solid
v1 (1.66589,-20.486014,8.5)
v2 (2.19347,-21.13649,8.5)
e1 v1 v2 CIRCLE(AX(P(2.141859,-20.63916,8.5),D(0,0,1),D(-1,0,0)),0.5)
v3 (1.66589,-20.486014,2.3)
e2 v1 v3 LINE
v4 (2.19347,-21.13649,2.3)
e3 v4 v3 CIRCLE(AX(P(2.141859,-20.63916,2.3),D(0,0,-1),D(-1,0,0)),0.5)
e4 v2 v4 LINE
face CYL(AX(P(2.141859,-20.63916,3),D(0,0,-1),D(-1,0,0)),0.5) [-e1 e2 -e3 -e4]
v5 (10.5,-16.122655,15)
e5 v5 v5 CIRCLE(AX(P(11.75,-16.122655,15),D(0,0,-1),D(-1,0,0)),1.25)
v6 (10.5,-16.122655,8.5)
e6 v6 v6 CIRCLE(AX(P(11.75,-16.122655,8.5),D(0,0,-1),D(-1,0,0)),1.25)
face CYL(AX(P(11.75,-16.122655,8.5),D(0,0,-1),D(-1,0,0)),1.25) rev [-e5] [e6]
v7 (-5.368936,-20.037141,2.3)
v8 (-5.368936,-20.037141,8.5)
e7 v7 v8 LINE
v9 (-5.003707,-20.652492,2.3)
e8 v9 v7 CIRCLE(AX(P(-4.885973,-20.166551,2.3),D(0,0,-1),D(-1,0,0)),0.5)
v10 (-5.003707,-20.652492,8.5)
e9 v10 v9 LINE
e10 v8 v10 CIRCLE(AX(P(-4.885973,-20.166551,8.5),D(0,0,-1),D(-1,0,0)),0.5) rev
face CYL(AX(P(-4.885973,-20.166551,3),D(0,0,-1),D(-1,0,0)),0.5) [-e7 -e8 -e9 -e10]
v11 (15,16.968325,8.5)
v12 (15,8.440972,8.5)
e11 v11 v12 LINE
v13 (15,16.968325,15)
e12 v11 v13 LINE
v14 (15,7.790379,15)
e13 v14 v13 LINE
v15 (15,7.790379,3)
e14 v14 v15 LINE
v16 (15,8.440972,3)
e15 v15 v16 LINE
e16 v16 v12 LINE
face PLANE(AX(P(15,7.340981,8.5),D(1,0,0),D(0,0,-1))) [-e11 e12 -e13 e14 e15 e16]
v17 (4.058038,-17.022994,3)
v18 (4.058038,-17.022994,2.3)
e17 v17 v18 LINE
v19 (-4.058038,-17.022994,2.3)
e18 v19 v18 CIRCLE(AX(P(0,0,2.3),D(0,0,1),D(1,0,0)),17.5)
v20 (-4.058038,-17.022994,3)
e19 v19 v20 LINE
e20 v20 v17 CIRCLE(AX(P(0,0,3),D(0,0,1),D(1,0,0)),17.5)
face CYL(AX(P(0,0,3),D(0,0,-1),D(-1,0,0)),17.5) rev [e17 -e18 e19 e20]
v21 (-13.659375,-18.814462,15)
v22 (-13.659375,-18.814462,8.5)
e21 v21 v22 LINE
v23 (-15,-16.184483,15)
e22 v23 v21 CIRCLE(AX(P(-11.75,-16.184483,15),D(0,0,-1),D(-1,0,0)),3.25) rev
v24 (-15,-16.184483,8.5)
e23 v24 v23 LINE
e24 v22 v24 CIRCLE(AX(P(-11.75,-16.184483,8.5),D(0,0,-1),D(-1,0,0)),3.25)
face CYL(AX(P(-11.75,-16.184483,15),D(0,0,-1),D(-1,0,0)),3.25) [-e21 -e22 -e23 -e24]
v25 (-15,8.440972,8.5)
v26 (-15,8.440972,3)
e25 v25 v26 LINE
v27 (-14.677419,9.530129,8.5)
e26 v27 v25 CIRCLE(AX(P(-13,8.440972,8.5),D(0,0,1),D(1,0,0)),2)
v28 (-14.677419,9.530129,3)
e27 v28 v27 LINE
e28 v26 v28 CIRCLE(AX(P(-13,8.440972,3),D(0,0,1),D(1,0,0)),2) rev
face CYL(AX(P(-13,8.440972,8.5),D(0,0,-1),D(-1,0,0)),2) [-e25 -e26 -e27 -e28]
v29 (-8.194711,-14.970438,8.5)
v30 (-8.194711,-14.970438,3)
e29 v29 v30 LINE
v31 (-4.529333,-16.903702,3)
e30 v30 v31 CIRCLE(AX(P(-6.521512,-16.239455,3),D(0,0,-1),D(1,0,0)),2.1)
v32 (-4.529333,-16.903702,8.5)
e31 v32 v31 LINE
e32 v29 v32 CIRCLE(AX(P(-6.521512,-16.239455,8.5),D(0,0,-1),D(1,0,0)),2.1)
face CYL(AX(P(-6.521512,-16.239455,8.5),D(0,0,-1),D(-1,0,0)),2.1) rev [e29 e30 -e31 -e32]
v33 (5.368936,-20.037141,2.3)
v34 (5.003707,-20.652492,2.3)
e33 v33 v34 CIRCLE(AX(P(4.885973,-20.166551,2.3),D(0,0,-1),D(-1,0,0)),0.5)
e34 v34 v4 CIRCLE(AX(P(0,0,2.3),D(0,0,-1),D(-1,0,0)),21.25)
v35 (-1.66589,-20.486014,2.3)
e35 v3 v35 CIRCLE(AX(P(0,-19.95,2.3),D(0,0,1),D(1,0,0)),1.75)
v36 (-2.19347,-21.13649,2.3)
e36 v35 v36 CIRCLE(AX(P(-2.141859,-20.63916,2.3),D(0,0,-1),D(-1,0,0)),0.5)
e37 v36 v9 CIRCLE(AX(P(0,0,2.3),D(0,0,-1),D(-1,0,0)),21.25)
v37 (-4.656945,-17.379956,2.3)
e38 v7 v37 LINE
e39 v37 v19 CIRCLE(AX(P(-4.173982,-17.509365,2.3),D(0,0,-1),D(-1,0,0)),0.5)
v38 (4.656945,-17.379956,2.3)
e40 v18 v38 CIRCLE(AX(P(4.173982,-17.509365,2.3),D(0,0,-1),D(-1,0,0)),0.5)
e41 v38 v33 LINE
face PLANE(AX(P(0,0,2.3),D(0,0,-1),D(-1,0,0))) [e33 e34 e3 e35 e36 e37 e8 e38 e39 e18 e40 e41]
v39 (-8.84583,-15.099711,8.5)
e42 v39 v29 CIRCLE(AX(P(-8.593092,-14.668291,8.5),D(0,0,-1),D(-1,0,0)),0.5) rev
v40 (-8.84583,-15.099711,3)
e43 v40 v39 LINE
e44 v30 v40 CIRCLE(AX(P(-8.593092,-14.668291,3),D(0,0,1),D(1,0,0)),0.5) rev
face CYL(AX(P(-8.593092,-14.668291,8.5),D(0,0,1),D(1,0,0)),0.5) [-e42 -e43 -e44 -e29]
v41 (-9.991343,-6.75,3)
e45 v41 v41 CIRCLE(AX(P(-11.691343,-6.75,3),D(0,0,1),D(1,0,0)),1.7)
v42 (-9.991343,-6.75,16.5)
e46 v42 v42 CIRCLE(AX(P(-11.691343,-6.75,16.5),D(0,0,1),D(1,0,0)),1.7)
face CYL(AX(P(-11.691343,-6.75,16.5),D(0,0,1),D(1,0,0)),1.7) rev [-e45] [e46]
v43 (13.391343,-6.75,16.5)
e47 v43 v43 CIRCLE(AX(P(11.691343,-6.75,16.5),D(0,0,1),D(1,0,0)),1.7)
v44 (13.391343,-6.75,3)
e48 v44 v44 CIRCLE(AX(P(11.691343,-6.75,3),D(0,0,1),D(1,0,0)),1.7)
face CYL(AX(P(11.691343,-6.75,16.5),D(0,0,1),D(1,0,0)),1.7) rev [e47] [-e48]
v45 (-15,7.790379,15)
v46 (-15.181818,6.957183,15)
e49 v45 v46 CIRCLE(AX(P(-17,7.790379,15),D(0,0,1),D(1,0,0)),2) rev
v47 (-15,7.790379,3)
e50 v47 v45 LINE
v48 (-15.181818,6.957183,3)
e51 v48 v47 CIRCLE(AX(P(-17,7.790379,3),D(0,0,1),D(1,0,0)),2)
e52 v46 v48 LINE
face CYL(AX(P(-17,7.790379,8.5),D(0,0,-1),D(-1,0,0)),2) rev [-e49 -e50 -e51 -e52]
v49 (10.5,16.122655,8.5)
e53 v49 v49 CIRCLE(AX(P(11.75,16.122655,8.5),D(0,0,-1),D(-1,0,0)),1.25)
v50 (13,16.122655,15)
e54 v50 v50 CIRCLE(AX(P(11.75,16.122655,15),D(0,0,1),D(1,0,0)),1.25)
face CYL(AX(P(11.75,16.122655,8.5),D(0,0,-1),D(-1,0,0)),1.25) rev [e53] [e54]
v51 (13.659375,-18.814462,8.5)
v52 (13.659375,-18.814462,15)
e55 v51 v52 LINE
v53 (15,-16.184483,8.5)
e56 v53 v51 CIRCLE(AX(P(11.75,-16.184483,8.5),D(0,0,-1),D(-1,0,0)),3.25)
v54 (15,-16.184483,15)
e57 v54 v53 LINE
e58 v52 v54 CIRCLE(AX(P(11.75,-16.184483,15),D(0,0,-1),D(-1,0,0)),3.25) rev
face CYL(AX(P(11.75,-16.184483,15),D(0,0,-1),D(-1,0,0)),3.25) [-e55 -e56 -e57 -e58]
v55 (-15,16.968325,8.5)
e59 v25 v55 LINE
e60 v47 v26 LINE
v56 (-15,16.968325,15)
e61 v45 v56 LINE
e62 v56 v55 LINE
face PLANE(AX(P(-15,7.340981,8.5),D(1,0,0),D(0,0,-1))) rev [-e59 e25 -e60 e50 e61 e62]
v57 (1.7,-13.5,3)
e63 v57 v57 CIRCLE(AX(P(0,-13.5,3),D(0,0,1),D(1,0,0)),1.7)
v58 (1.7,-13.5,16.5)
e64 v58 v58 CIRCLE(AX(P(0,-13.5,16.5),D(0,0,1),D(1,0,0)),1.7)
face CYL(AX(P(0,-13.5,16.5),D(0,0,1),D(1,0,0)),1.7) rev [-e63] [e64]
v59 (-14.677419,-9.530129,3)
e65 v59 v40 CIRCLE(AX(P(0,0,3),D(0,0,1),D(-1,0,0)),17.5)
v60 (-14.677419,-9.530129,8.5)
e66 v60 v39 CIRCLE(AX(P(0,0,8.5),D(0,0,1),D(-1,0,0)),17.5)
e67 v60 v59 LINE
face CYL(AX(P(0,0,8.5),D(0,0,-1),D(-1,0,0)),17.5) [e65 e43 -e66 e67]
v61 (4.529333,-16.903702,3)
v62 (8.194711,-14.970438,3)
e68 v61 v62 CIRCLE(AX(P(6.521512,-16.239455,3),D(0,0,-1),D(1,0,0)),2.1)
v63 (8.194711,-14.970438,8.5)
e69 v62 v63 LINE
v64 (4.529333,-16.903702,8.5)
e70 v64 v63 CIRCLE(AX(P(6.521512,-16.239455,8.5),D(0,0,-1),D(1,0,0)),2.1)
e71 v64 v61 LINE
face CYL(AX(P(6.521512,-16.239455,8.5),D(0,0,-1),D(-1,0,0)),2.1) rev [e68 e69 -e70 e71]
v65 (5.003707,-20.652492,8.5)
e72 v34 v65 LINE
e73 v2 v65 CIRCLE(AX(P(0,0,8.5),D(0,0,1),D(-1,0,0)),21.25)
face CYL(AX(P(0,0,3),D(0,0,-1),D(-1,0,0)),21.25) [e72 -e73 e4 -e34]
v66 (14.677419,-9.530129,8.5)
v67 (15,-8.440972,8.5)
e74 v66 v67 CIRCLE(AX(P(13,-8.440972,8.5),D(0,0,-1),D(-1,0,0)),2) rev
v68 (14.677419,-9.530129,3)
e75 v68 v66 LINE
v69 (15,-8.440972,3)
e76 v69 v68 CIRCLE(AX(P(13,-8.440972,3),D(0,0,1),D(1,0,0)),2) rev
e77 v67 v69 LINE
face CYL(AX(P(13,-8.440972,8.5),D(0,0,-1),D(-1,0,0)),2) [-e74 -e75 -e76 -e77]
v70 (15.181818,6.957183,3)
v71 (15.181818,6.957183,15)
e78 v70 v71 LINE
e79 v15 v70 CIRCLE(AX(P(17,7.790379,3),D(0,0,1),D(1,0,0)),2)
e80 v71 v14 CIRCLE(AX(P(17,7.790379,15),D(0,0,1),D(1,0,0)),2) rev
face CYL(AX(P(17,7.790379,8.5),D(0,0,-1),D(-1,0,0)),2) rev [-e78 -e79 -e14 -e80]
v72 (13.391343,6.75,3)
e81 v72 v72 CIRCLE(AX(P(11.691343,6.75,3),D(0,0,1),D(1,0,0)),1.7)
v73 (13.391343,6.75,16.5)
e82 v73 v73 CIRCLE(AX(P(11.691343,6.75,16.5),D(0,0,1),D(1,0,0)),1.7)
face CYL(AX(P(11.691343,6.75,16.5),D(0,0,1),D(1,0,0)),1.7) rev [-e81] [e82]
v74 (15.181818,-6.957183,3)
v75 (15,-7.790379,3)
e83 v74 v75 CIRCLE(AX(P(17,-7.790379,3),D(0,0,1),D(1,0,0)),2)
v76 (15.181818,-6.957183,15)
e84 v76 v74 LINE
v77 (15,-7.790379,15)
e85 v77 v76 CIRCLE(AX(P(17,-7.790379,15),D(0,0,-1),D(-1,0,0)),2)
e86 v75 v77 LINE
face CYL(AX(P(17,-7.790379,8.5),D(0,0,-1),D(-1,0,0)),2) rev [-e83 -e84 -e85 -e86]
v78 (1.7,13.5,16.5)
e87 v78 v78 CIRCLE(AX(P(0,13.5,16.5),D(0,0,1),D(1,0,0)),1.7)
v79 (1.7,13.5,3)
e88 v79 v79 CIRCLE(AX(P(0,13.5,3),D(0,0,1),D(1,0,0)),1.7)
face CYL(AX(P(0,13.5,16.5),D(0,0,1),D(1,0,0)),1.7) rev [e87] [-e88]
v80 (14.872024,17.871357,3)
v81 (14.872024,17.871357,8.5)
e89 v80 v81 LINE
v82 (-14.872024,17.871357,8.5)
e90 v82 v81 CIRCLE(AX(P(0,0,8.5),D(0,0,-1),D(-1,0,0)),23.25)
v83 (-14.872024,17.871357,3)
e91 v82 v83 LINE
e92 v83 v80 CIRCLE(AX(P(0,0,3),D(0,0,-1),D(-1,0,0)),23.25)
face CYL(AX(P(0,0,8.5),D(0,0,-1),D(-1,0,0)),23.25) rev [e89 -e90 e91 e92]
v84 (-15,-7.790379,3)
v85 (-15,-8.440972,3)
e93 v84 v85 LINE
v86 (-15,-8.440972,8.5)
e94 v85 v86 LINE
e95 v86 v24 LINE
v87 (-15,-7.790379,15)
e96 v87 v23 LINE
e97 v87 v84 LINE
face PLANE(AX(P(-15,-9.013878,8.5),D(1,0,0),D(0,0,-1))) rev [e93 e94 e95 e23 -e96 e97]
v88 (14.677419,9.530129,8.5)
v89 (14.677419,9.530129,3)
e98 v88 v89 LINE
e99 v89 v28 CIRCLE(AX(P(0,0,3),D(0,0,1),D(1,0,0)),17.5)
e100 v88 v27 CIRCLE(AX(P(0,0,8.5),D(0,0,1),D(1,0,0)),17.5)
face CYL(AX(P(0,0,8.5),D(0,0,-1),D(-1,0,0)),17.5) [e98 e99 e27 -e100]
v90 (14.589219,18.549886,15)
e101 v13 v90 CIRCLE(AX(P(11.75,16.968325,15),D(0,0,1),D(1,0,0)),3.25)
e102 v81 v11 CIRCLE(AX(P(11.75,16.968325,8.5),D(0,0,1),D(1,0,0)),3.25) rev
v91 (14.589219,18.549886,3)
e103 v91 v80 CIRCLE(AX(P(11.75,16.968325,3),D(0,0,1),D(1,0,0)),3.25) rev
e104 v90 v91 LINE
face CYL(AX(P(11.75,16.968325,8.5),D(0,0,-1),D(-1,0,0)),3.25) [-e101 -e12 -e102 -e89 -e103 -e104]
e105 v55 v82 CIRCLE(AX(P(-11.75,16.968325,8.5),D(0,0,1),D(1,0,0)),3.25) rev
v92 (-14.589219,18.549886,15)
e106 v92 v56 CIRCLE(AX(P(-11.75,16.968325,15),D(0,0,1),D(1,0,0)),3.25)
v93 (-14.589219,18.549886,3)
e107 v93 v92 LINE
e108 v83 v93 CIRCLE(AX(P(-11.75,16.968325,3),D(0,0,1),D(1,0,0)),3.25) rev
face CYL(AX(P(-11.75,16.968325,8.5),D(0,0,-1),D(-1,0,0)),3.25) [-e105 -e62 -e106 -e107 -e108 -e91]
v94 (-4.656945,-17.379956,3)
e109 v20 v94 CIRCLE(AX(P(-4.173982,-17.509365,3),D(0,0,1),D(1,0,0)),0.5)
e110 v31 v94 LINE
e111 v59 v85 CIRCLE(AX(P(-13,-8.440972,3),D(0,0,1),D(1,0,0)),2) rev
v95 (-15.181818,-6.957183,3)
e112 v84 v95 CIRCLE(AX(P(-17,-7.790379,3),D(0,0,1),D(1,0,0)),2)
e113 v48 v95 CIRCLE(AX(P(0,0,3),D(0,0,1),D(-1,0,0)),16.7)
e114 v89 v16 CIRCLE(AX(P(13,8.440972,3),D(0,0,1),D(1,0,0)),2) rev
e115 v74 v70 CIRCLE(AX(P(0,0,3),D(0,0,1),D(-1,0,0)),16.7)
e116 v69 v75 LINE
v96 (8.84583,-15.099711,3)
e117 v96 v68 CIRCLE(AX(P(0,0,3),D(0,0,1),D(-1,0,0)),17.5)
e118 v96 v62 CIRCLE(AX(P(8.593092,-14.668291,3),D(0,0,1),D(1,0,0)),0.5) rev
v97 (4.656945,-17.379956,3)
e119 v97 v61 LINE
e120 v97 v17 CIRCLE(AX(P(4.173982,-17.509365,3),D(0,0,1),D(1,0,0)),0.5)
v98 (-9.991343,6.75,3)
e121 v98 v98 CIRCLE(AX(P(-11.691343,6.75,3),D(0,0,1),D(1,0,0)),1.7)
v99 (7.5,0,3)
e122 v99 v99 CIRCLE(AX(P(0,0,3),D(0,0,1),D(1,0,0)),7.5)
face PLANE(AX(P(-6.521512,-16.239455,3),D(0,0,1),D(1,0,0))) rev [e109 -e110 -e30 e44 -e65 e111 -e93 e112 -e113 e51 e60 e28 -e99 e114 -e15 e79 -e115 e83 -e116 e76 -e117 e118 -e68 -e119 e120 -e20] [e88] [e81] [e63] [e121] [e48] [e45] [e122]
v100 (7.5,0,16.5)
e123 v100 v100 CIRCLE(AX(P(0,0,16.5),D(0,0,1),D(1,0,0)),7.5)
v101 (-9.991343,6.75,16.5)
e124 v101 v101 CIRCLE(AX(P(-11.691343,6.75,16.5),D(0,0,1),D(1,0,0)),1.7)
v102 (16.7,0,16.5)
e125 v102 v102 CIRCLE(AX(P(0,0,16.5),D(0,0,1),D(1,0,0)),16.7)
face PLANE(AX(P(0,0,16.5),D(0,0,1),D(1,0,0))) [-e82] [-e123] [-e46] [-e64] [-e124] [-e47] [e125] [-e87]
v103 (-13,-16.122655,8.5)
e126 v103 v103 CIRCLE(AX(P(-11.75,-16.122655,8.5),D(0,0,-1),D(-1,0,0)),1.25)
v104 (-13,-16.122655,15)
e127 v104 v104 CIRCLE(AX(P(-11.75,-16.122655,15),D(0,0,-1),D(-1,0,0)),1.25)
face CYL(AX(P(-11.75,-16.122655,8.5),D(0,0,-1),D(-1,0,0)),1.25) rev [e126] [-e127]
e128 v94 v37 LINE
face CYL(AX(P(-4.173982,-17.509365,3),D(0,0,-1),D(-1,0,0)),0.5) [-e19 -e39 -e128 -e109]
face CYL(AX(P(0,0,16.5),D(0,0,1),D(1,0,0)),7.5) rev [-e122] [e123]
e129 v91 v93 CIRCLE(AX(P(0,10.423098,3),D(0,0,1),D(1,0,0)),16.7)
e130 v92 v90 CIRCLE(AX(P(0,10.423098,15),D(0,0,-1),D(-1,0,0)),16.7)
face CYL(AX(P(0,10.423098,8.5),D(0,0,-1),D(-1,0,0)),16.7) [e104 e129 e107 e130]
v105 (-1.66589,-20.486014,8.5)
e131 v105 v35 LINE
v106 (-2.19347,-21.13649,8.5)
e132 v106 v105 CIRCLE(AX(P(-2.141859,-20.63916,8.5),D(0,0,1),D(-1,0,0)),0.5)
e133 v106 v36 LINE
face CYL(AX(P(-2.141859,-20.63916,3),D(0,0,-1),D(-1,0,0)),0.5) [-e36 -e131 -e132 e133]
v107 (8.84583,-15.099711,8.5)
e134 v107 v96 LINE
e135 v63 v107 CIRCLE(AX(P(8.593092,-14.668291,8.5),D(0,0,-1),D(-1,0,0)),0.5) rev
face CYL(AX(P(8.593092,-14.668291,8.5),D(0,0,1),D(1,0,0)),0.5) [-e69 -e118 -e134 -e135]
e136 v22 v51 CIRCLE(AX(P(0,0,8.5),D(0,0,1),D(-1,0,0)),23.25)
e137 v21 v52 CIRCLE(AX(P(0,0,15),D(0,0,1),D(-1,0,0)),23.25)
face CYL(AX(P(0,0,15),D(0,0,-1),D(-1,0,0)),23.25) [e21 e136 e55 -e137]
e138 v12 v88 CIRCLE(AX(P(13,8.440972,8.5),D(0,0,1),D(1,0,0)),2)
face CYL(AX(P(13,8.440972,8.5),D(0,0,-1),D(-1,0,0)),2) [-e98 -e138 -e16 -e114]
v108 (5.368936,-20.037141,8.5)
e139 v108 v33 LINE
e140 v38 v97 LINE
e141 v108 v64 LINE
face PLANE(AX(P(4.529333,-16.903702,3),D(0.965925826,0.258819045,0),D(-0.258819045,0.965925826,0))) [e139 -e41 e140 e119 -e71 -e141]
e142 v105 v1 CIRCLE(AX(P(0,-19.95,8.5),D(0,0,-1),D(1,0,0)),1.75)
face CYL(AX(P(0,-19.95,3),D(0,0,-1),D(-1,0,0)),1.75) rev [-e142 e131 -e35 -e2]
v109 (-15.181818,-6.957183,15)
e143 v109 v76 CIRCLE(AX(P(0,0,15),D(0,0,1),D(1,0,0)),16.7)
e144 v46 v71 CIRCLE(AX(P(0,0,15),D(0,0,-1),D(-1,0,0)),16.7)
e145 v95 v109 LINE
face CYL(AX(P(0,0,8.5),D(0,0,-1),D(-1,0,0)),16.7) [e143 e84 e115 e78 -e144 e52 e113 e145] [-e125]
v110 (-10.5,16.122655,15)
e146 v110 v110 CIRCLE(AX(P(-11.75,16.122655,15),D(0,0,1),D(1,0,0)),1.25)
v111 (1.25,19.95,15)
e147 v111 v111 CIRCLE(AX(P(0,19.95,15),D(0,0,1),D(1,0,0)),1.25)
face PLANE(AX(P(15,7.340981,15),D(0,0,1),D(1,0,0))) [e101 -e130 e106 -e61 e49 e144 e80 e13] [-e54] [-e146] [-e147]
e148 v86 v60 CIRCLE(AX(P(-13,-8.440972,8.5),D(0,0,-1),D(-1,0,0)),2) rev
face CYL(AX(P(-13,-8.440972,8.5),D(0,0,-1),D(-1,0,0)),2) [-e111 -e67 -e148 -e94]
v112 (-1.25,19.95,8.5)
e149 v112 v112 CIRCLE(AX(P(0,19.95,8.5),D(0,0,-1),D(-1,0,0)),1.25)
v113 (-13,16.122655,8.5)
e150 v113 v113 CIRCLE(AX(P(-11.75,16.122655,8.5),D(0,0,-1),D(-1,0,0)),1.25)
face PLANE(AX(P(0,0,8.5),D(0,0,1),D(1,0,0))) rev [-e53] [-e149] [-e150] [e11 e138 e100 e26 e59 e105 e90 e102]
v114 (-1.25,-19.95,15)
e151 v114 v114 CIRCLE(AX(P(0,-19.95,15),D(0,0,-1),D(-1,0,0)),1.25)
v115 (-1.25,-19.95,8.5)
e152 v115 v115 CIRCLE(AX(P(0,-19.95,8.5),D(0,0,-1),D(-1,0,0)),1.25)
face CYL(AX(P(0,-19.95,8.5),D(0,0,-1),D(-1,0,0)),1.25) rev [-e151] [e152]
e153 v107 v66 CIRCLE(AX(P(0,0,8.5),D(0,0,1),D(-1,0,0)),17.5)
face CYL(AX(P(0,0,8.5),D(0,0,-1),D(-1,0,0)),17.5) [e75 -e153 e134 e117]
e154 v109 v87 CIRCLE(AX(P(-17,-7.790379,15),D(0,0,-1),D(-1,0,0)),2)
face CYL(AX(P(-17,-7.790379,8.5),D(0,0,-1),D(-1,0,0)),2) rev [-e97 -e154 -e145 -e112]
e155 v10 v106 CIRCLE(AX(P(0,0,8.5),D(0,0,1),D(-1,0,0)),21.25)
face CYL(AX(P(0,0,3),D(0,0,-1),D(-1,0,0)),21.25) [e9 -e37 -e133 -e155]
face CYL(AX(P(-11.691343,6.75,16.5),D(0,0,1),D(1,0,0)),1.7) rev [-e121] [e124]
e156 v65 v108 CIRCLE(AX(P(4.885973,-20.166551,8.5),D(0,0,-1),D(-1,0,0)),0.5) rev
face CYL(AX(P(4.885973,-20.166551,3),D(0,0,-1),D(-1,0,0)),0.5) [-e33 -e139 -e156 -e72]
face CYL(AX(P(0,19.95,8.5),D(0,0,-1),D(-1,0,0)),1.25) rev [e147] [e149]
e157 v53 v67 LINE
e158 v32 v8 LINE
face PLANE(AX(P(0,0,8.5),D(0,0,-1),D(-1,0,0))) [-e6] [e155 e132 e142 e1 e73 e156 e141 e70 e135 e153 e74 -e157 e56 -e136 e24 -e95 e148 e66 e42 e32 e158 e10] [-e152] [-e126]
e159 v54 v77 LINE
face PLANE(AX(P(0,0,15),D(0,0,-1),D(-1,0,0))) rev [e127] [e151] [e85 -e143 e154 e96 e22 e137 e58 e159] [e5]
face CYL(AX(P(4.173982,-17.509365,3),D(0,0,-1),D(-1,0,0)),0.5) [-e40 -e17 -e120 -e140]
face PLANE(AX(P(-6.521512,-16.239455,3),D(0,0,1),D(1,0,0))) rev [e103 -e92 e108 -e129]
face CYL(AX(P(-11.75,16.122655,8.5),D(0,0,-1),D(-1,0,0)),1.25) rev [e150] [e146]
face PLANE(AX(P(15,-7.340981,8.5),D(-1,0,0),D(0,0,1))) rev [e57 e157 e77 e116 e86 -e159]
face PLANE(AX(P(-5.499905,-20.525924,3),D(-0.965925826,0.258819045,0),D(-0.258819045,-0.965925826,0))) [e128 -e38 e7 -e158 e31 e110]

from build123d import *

# Parameters (mm, degrees)
EXTRUDE_1_DEPTH             = 0.7
EXTRUDE_2_DEPTH             = 5.5
EXTRUDE_3_DEPTH             = 6.5
SKETCH_4_R                  = 16.7
EXTRUDE_4_DEPTH             = 1.5
EXTRUDE_5_REACH             = 43.838
EXTRUDE_5_START_RADIUS      = 16.7
EXTRUDE_5_END_RADIUS        = 16.7
SKETCH_5_W                  = 30
SKETCH_5_H                  = 12
CUT_EXTRUDE_1_DEPTH         = 5.5
HOLE_WIZARD_2_5_2_5_1_D     = 2.5
HOLE_WIZARD_2_5_2_5_1_DEPTH = 8
HOLE_WIZARD_15_0_15_1_D     = 15
HOLE_WIZARD_15_0_15_1_DEPTH = 14.2
HOLE_WIZARD_3_4_3_4_1_D     = 3.4
HOLE_WIZARD_3_4_3_4_1_DEPTH = 14.2
FILLET_1_R                  = 0.5
FILLET_2_R                  = 2
FILLET_START                = 2
FILLET_3_DEPTH              = 14


with BuildPart() as part:
    # 草图1 → 凸台-拉伸1 (new body)
    with BuildSketch(Plane(origin=(0, 0, 2.3), x_dir=(-1, 0, 0), z_dir=(0, 0, -1))):
        with BuildLine():
            Line((5.499904708, -20.525923809), (4.529333289, -16.90370196))
            ThreePointArc((4.529333289, -16.90370196), (0, -17.5), (-4.529333289, -16.90370196))
            Line((-4.529333289, -16.90370196), (-5.499904708, -20.525923809))
            ThreePointArc((-5.499904708, -20.525923809), (-3.858782139, -20.896705492), (-2.193469574, -21.136489567))
            ThreePointArc((-2.193469574, -21.136489567), (-1.75352934, -20.954121421), (-1.665889964, -20.486013645))
            ThreePointArc((-1.665889964, -20.486013645), (0, -18.2), (1.665889964, -20.486013645))
            ThreePointArc((1.665889964, -20.486013645), (1.75352934, -20.954121421), (2.193469574, -21.136489567))
            ThreePointArc((2.193469574, -21.136489567), (3.858782139, -20.896705492), (5.499904708, -20.525923809))
        make_face()
    extrude(amount=-EXTRUDE_1_DEPTH)

    # 草图2 → 凸台-拉伸2 (add)
    with BuildSketch(Plane.XY.offset(3)):
        with BuildLine():
            Line((-15, -9.013878189), (-15, -7.340980861))
            ThreePointArc((-15, -7.340980861), (0, 16.7), (15, -7.340980861))
            Line((15, -7.340980861), (15, -9.013878189))
            ThreePointArc((15, -9.013878189), (12.1297479, -12.614246544), (8.419780607, -15.341358953))
            ThreePointArc((8.419780607, -15.341358953), (5.738930413, -14.290719986), (4.529333289, -16.90370196))
            Line((4.529333289, -16.90370196), (5.499904708, -20.525923809))
            ThreePointArc((5.499904708, -20.525923809), (3.858782139, -20.896705492), (2.193469574, -21.136489567))
            ThreePointArc((2.193469574, -21.136489567), (1.75352934, -20.954121421), (1.665889964, -20.486013645))
            ThreePointArc((1.665889964, -20.486013645), (0, -18.2), (-1.665889964, -20.486013645))
            ThreePointArc((-1.665889964, -20.486013645), (-1.75352934, -20.954121421), (-2.193469574, -21.136489567))
            ThreePointArc((-2.193469574, -21.136489567), (-3.858782139, -20.896705492), (-5.499904708, -20.525923809))
            Line((-5.499904708, -20.525923809), (-4.529333289, -16.90370196))
            ThreePointArc((-4.529333289, -16.90370196), (-5.738930413, -14.290719986), (-8.419780607, -15.341358953))
            ThreePointArc((-8.419780607, -15.341358953), (-12.1297479, -12.614246544), (-15, -9.013878189))
        make_face()
    extrude(amount=EXTRUDE_2_DEPTH)

    # 草图3 → 凸台-拉伸3 (add)
    with BuildSketch(Plane.XY.offset(8.5)):
        with BuildLine():
            Line((-15, -17.764078923), (-15, -7.340980861))
            ThreePointArc((-15, -7.340980861), (0, 16.7), (15, -7.340980861))
            Line((15, -7.340980861), (15, -17.764078923))
            ThreePointArc((15, -17.764078923), (0, -23.25), (-15, -17.764078923))
        make_face()
    extrude(amount=EXTRUDE_3_DEPTH)

    # 草图4 → 凸台-拉伸4 (add)
    with BuildSketch(Plane.XY.offset(15)):
        with Locations(Location((0, 0, 0), (0, 0, 206.077066929))):
            Circle(SKETCH_4_R)
    extrude(amount=EXTRUDE_4_DEPTH)

    # 凸台-拉伸5: from a cylinder face, 43.838 long prism both ways, kept between that surface and its translate by the depth
    extrude_5_start = Plane(origin=(0, 0, 9), z_dir=(0, 0, -1)) * Cylinder(EXTRUDE_5_START_RADIUS, 122.076, mode=Mode.PRIVATE)
    extrude_5_end = Plane(origin=(0, 10.423098063, 9), z_dir=(0, 0, -1)) * Cylinder(EXTRUDE_5_END_RADIUS, 122.076, mode=Mode.PRIVATE)
    # 草图5 → 凸台-拉伸5 (add, from a surface)
    with BuildSketch(Plane(origin=(0, -4.175, 0), x_dir=(1, 0, 0), z_dir=(0, 1, 0)), mode=Mode.PRIVATE) as extrude_5_sk1:
        with Locations((0, -9)):
            Rectangle(SKETCH_5_W, SKETCH_5_H)
    extrude_5_tool1 = extrude(extrude_5_sk1.sketch, amount=EXTRUDE_5_REACH, both=True, mode=Mode.PRIVATE)
    add(((extrude_5_tool1 - extrude_5_start) & extrude_5_end).solids().sort_by_distance((0, 12.55253, 9))[0])

    # 草图6 → 切除-拉伸1 (cut)
    with BuildSketch(Plane(origin=(0, 0, 3), x_dir=(-1, 0, 0), z_dir=(0, 0, -1))):
        with BuildLine():
            Line((15, 9.013878189), (15, 17.764078923))
            ThreePointArc((15, 17.764078923), (0, 23.25), (-15, 17.764078923))
            Line((-15, 17.764078923), (-15, 9.013878189))
            ThreePointArc((-15, 9.013878189), (0, 17.5), (15, 9.013878189))
        make_face()
    extrude(amount=-CUT_EXTRUDE_1_DEPTH, mode=Mode.SUBTRACT)

    # Ø2.5 (2.5) 直径孔1
    with Locations(Plane(origin=(0, 0, 8.5), x_dir=(-1, 0, 0), z_dir=(0, 0, -1))):
        with Locations((0, -19.95), (11.75, -16.122654868), (-11.75, -16.122654868), (-11.75, 16.122654868), (0, 19.95), (11.75, 16.122654868)):
            Hole(HOLE_WIZARD_2_5_2_5_1_D / 2, depth=HOLE_WIZARD_2_5_2_5_1_DEPTH)

    # Ø15.0 (15) 直径孔1
    with Locations(Plane.XY.offset(16.5)):
        with Locations((0, 0)):
            Hole(HOLE_WIZARD_15_0_15_1_D / 2, depth=HOLE_WIZARD_15_0_15_1_DEPTH)

    # Ø3.4 (3.4) 直径孔1
    with Locations(Plane.XY.offset(16.5)):
        with Locations((11.691342951, -6.75), (11.691342951, 6.75), (0, 13.5), (-11.691342951, 6.75), (-11.691342951, -6.75), (0, -13.5)):
            Hole(HOLE_WIZARD_3_4_3_4_1_D / 2, depth=HOLE_WIZARD_3_4_3_4_1_DEPTH)

    # 圆角1
    fillet_1_edges = [part.edges().sort_by_distance(p)[0] for p in [
        (5.499904708, -20.525923809, 5.4),
        (4.529333289, -16.90370196, 2.65),
        (-4.529333289, -16.90370196, 2.65),
        (-5.499904708, -20.525923809, 5.4),
        (-8.419780607, -15.341358953, 5.75),
        (8.419780607, -15.341358953, 5.75),
    ]]
    fillet(fillet_1_edges, radius=FILLET_1_R)

    # 圆角2
    # the kernel refuses this fillet: 2 mm, written as the material it adds along each edge
    with BuildSketch(Plane(origin=(15, -7.340980861, 3), x_dir=(0, -1, 0), z_dir=(0, 0, 1)), Plane(origin=(-15, -7.340980861, 15), x_dir=(0, -1, 0), z_dir=(0, 0, -1))) as fillet_2_piece_1:
        with BuildLine():
            CenterArc((0.449397821, 2), FILLET_2_R, 245.380022671, 24.619977329)
            ThreePointArc((-0.38379776, 0.181818182), (-0.191320895, 0.092129153), (0, 0))
            Line((0, 0), (0.449397821, 0))
        make_face()
    extrude(amount=12)
    with BuildSketch(Plane(origin=(-15, 7.340980861, 15), x_dir=(-0.4281233512586551, -0.9037203085618128, 0), z_dir=(0, 0, -1))) as fillet_2_piece_2:
        with BuildLine():
            CenterArc((0.450116765, 1.999838318), FILLET_2_R, 244.651477871, 24.619977329)
            Line((-0.406129937, 0.192397701), (0, 0))
            ThreePointArc((0, 0), (0.21234322, 0.001350044), (0.42468644, 0))
        make_face()
    extrude(amount=12)
    with BuildSketch(Plane(origin=(15, 7.340980861, 15), x_dir=(0.4281233512586662, -0.9037203085618076, 0), z_dir=(0, 0, -1))) as fillet_2_piece_3:
        with BuildLine():
            CenterArc((0.450116765, -1.999838318), FILLET_2_R, 90.7285448, 24.619977329)
            Line((-0.406129937, -0.192397701), (0, 0))
            ThreePointArc((0, 0), (0.21234322, -0.001350044), (0.42468644, 0))
        make_face()
    extrude(amount=12)
    # the kernel refuses this fillet: 2 mm, written as the material it takes off along each edge
    with BuildSketch(Plane(origin=(-15, 9.013878189, 1.478131702), x_dir=(0, -1, 0), z_dir=(0, 0, 1))) as fillet_2_2_piece_1:
        with BuildLine():
            CenterArc((0.572906681, 2), FILLET_2_R, 237.004114526, 32.995885474)
            ThreePointArc((-0.516250933, 0.322580645), (-0.259528216, 0.159045393), (0, 0))
            Line((0, 0), (0.572906681, 0))
        make_face()
    extrude(amount=7.021868298, mode=Mode.SUBTRACT)
    with BuildSketch(Plane(origin=(15, 9.013878189, 1.478131702), x_dir=(0, -1, 0), z_dir=(0, 0, 1)), Plane(origin=(-15, -9.013878189, 1.478131702), x_dir=(0, 1, 0), z_dir=(0, 0, 1))) as fillet_2_2_piece_2:
        with BuildLine():
            CenterArc((0.572906681, -2), FILLET_2_R, 90, 32.995885474)
            ThreePointArc((-0.516250933, -0.322580645), (-0.259528216, -0.159045393), (0, 0))
            Line((0, 0), (0.572906681, 0))
        make_face()
    extrude(amount=7.021868298, mode=Mode.SUBTRACT)
    with BuildSketch(Plane(origin=(15, -9.013878189, 1.478131702), x_dir=(-0.5299089374298662, -0.8480545489719102, 0), z_dir=(0, 0, 1))) as fillet_2_2_piece_3:
        with BuildLine():
            CenterArc((0.573961758, -1.999697468), FILLET_2_R, 89.00341683, 32.995885474)
            Line((-0.485856117, -0.30358837), (0, 0))
            ThreePointArc((0, 0), (0.30437366, 0.002647152), (0.608747319, 0))
        make_face()
    extrude(amount=7.021868298, mode=Mode.SUBTRACT)

    # 圆角3: read off the stored shape, not the designer's step
    # 圆角3 outline → 圆角3 (cut)
    with BuildSketch(Plane.XY.offset(FILLET_START)):
        with BuildLine():
            ThreePointArc((15, 17.764078923), (14.799825954, 18.159709189), (14.589219331, 18.549885824))
            ThreePointArc((14.589219331, 18.549885824), (14.895628938, 17.785343438), (15, 16.968325331))
            Line((15, 16.968325331), (15, 17.764078923))
        make_face()
        with BuildLine():
            ThreePointArc((-14.589219331, 18.549885824), (-14.799825954, 18.159709189), (-15, 17.764078923))
            Line((-15, 17.764078923), (-15, 16.968325331))
            ThreePointArc((-15, 16.968325331), (-14.895628938, 17.785343438), (-14.589219331, 18.549885824))
        make_face()
        with BuildLine():
            Line((15, -17.764078923), (15, -16.18448331))
            ThreePointArc((15, -16.18448331), (14.645511073, -17.660462857), (13.659375, -18.814461847))
            ThreePointArc((13.659375, -18.814461847), (14.339308558, -18.301549936), (15, -17.764078923))
        make_face()
        with BuildLine():
            ThreePointArc((-15, -17.764078923), (-14.339308558, -18.301549936), (-13.659375, -18.814461847))
            ThreePointArc((-13.659375, -18.814461847), (-14.645511073, -17.660462857), (-15, -16.18448331))
            Line((-15, -16.18448331), (-15, -17.764078923))
        make_face()
    extrude(amount=FILLET_3_DEPTH, mode=Mode.SUBTRACT)


solid = part.part
